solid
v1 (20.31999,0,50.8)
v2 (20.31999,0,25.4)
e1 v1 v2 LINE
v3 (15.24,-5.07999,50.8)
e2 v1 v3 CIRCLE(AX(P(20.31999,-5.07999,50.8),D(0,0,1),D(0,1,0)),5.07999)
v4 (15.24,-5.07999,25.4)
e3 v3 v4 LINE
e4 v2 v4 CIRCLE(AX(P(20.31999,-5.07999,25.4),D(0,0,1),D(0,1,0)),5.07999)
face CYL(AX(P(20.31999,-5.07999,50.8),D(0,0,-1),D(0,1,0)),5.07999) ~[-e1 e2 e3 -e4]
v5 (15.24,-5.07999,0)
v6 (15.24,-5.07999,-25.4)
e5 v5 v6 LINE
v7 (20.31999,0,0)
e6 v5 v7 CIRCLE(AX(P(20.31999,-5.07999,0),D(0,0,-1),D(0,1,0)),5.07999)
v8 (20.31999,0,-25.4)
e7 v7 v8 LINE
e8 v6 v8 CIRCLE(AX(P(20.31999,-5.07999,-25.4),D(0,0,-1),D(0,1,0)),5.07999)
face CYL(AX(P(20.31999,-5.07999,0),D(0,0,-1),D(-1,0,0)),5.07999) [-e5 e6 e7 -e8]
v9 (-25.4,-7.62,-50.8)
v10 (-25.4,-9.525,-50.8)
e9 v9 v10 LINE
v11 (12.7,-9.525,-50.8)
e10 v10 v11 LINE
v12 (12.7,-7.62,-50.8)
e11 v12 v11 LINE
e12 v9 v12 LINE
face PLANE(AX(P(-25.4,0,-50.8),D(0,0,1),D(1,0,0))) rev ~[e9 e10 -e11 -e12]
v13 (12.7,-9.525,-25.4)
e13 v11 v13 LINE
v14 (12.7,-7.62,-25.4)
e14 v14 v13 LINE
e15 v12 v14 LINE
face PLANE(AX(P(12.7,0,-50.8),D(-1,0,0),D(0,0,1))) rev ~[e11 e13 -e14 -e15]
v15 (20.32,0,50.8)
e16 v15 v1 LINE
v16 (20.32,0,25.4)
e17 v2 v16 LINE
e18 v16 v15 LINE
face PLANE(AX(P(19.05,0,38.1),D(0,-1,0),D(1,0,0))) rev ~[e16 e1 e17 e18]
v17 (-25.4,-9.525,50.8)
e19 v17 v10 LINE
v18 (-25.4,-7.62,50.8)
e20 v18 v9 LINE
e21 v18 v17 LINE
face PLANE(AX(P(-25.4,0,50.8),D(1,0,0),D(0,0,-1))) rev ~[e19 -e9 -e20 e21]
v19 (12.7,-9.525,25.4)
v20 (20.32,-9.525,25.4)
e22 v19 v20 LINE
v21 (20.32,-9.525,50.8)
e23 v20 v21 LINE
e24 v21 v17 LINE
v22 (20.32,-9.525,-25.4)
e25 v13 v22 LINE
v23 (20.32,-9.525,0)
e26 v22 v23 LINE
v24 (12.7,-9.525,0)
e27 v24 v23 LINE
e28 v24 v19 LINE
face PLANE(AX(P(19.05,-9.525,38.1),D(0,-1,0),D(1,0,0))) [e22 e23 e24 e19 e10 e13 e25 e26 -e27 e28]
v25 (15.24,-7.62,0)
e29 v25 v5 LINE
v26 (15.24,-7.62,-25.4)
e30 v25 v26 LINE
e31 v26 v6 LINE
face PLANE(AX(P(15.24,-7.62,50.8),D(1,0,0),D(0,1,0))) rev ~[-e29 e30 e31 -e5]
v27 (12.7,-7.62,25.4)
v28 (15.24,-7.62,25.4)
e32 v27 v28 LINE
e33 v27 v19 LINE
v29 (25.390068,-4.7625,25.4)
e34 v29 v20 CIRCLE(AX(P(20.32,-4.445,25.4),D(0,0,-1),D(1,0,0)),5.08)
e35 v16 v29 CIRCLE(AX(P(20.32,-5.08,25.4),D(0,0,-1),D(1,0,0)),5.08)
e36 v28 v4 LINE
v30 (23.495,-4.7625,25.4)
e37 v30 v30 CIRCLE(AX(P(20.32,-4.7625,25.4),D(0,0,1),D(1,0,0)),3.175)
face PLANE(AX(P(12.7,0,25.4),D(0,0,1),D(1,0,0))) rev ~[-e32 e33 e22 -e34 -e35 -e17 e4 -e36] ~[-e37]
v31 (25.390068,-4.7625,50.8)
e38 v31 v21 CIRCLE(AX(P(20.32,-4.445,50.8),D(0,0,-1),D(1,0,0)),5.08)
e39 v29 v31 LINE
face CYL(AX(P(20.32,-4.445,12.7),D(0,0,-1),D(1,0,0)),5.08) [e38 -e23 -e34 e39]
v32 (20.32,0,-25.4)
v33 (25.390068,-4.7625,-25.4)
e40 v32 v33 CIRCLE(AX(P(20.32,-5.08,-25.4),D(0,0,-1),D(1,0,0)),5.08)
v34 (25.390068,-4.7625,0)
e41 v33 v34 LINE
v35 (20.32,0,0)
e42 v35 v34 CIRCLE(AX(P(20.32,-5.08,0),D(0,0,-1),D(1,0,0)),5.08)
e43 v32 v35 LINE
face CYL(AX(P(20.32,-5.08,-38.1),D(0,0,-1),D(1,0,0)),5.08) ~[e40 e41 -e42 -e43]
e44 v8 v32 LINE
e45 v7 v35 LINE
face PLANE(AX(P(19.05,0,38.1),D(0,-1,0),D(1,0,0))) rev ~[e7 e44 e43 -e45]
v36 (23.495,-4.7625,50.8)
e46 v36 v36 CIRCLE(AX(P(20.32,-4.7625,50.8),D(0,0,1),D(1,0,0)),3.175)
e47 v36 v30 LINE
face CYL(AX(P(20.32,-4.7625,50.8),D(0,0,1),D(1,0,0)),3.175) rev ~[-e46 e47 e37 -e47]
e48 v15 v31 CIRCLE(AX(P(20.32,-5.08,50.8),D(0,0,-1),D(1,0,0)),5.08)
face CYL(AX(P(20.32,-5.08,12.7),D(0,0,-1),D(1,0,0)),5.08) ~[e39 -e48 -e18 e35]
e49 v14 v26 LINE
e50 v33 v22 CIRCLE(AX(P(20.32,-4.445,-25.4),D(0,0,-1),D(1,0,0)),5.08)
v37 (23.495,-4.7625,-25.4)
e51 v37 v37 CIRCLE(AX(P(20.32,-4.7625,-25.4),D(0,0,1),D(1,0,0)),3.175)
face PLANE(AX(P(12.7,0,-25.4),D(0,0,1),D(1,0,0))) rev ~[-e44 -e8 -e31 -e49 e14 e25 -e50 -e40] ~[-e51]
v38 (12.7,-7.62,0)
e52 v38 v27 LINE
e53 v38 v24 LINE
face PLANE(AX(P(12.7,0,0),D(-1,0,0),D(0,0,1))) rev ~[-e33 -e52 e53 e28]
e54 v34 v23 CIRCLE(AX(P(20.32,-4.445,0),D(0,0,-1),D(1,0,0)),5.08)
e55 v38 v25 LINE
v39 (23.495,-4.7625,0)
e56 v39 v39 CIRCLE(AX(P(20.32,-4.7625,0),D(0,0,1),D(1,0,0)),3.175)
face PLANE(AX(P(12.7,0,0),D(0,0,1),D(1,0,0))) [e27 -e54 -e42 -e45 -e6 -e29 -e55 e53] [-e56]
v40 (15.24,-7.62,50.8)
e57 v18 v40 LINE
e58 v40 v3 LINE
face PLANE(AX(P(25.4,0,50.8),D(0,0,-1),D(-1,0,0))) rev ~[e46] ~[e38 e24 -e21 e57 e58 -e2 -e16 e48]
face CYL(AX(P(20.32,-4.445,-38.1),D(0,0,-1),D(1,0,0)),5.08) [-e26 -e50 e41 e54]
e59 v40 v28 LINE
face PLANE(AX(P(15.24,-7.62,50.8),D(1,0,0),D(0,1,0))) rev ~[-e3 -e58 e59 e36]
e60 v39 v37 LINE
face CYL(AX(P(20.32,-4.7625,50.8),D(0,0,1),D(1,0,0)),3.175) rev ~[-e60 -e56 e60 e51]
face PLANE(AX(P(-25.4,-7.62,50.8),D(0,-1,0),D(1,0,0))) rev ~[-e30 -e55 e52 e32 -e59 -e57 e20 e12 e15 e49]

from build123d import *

# Parameters (mm, degrees)
F0_W        = 12.7
F0_H        = 25.4
F1_DEPTH    = 9.525
F2_T1_DEPTH = 50.8
F2_T3_DEPTH = 50.8
F3_R        = 3.175
F4_DEPTH    = 101.601
F5_W        = 40.64
F5_H        = 7.62
F6_DEPTH    = 101.601
F7_R        = 5.07999


# Not quite as in the source:
# - a fillet or chamfer that OpenCascade refuses, or shapes differently, is made with other operations: its cross-section is extruded or revolved along the edge and cut away or added
# - a fillet or chamfer is up to 0.001 mm smaller than in the source, because OpenCascade refuses the exact size


with BuildPart() as f1:
    # F0 (on Front) → F1 (new body)
    with BuildSketch(Plane.XZ):
        with Locations((19.05, 38.1)):
            Rectangle(F0_W, F0_H)
        Polygon((12.7, 25.4), (12.7, 50.8), (-25.4, 50.8), (-25.4, -50.8), (12.7, -50.8), (12.7, -25.4), (12.7, 0), align=None)
        with Locations((19.05, -12.7)):
            Rectangle(F0_W, F0_H)
    extrude(amount=F1_DEPTH)

    # F2: fillet of radius 5.08 on 4 edges, made by hand

    # F2_s2 → F2_t1 (cut)
    with BuildSketch(Plane.XY.offset(12.7)):
        with BuildLine():
            ThreePointArc((25.4, -5.08), (23.9121024484, -1.4878975516), (20.32, 0))
            Line((20.32, 0), (25.4, 0))
            Line((25.4, 0), (25.4, -5.08))
        make_face()
        with BuildLine():
            ThreePointArc((25.4, -4.445), (23.9121024484, -8.0371024484), (20.32, -9.525))
            Line((20.32, -9.525), (25.4, -9.525))
            Line((25.4, -9.525), (25.4, -4.445))
        make_face()
    extrude(amount=F2_T1_DEPTH, mode=Mode.SUBTRACT)

    # F2_s4 → F2_t3 (cut)
    with BuildSketch(Plane.XY.offset(-38.1)):
        with BuildLine():
            ThreePointArc((25.4, -5.08), (23.9121024484, -1.4878975516), (20.32, 0))
            Line((20.32, 0), (25.4, 0))
            Line((25.4, 0), (25.4, -5.08))
        make_face()
        with BuildLine():
            ThreePointArc((25.4, -4.445), (23.9121024484, -8.0371024484), (20.32, -9.525))
            Line((20.32, -9.525), (25.4, -9.525))
            Line((25.4, -9.525), (25.4, -4.445))
        make_face()
    extrude(amount=F2_T3_DEPTH, mode=Mode.SUBTRACT)

    # F3 (on face) → F4 (cut, through all)
    with BuildSketch(Plane.XY.offset(50.8)):
        with Locations((20.32, -4.7625)):
            Circle(F3_R)
    extrude(amount=-F4_DEPTH, mode=Mode.SUBTRACT)

    # F5 (on face) → F6 (cut, through all)
    with BuildSketch(Plane.XY.offset(50.8)):
        with Locations((-5.08, -3.81)):
            Rectangle(F5_W, F5_H)
    extrude(amount=-F6_DEPTH, mode=Mode.SUBTRACT)

    # F7 (radius 5.08 in the source; OpenCascade refuses exactly that, so slightly less here)
    f7_edges = [f1.edges().sort_by_distance(p)[0] for p in [
        (15.24, 0, 38.1),
        (15.24, 0, -12.7),
    ]]
    fillet(f7_edges, radius=F7_R)


solid = f1.part
